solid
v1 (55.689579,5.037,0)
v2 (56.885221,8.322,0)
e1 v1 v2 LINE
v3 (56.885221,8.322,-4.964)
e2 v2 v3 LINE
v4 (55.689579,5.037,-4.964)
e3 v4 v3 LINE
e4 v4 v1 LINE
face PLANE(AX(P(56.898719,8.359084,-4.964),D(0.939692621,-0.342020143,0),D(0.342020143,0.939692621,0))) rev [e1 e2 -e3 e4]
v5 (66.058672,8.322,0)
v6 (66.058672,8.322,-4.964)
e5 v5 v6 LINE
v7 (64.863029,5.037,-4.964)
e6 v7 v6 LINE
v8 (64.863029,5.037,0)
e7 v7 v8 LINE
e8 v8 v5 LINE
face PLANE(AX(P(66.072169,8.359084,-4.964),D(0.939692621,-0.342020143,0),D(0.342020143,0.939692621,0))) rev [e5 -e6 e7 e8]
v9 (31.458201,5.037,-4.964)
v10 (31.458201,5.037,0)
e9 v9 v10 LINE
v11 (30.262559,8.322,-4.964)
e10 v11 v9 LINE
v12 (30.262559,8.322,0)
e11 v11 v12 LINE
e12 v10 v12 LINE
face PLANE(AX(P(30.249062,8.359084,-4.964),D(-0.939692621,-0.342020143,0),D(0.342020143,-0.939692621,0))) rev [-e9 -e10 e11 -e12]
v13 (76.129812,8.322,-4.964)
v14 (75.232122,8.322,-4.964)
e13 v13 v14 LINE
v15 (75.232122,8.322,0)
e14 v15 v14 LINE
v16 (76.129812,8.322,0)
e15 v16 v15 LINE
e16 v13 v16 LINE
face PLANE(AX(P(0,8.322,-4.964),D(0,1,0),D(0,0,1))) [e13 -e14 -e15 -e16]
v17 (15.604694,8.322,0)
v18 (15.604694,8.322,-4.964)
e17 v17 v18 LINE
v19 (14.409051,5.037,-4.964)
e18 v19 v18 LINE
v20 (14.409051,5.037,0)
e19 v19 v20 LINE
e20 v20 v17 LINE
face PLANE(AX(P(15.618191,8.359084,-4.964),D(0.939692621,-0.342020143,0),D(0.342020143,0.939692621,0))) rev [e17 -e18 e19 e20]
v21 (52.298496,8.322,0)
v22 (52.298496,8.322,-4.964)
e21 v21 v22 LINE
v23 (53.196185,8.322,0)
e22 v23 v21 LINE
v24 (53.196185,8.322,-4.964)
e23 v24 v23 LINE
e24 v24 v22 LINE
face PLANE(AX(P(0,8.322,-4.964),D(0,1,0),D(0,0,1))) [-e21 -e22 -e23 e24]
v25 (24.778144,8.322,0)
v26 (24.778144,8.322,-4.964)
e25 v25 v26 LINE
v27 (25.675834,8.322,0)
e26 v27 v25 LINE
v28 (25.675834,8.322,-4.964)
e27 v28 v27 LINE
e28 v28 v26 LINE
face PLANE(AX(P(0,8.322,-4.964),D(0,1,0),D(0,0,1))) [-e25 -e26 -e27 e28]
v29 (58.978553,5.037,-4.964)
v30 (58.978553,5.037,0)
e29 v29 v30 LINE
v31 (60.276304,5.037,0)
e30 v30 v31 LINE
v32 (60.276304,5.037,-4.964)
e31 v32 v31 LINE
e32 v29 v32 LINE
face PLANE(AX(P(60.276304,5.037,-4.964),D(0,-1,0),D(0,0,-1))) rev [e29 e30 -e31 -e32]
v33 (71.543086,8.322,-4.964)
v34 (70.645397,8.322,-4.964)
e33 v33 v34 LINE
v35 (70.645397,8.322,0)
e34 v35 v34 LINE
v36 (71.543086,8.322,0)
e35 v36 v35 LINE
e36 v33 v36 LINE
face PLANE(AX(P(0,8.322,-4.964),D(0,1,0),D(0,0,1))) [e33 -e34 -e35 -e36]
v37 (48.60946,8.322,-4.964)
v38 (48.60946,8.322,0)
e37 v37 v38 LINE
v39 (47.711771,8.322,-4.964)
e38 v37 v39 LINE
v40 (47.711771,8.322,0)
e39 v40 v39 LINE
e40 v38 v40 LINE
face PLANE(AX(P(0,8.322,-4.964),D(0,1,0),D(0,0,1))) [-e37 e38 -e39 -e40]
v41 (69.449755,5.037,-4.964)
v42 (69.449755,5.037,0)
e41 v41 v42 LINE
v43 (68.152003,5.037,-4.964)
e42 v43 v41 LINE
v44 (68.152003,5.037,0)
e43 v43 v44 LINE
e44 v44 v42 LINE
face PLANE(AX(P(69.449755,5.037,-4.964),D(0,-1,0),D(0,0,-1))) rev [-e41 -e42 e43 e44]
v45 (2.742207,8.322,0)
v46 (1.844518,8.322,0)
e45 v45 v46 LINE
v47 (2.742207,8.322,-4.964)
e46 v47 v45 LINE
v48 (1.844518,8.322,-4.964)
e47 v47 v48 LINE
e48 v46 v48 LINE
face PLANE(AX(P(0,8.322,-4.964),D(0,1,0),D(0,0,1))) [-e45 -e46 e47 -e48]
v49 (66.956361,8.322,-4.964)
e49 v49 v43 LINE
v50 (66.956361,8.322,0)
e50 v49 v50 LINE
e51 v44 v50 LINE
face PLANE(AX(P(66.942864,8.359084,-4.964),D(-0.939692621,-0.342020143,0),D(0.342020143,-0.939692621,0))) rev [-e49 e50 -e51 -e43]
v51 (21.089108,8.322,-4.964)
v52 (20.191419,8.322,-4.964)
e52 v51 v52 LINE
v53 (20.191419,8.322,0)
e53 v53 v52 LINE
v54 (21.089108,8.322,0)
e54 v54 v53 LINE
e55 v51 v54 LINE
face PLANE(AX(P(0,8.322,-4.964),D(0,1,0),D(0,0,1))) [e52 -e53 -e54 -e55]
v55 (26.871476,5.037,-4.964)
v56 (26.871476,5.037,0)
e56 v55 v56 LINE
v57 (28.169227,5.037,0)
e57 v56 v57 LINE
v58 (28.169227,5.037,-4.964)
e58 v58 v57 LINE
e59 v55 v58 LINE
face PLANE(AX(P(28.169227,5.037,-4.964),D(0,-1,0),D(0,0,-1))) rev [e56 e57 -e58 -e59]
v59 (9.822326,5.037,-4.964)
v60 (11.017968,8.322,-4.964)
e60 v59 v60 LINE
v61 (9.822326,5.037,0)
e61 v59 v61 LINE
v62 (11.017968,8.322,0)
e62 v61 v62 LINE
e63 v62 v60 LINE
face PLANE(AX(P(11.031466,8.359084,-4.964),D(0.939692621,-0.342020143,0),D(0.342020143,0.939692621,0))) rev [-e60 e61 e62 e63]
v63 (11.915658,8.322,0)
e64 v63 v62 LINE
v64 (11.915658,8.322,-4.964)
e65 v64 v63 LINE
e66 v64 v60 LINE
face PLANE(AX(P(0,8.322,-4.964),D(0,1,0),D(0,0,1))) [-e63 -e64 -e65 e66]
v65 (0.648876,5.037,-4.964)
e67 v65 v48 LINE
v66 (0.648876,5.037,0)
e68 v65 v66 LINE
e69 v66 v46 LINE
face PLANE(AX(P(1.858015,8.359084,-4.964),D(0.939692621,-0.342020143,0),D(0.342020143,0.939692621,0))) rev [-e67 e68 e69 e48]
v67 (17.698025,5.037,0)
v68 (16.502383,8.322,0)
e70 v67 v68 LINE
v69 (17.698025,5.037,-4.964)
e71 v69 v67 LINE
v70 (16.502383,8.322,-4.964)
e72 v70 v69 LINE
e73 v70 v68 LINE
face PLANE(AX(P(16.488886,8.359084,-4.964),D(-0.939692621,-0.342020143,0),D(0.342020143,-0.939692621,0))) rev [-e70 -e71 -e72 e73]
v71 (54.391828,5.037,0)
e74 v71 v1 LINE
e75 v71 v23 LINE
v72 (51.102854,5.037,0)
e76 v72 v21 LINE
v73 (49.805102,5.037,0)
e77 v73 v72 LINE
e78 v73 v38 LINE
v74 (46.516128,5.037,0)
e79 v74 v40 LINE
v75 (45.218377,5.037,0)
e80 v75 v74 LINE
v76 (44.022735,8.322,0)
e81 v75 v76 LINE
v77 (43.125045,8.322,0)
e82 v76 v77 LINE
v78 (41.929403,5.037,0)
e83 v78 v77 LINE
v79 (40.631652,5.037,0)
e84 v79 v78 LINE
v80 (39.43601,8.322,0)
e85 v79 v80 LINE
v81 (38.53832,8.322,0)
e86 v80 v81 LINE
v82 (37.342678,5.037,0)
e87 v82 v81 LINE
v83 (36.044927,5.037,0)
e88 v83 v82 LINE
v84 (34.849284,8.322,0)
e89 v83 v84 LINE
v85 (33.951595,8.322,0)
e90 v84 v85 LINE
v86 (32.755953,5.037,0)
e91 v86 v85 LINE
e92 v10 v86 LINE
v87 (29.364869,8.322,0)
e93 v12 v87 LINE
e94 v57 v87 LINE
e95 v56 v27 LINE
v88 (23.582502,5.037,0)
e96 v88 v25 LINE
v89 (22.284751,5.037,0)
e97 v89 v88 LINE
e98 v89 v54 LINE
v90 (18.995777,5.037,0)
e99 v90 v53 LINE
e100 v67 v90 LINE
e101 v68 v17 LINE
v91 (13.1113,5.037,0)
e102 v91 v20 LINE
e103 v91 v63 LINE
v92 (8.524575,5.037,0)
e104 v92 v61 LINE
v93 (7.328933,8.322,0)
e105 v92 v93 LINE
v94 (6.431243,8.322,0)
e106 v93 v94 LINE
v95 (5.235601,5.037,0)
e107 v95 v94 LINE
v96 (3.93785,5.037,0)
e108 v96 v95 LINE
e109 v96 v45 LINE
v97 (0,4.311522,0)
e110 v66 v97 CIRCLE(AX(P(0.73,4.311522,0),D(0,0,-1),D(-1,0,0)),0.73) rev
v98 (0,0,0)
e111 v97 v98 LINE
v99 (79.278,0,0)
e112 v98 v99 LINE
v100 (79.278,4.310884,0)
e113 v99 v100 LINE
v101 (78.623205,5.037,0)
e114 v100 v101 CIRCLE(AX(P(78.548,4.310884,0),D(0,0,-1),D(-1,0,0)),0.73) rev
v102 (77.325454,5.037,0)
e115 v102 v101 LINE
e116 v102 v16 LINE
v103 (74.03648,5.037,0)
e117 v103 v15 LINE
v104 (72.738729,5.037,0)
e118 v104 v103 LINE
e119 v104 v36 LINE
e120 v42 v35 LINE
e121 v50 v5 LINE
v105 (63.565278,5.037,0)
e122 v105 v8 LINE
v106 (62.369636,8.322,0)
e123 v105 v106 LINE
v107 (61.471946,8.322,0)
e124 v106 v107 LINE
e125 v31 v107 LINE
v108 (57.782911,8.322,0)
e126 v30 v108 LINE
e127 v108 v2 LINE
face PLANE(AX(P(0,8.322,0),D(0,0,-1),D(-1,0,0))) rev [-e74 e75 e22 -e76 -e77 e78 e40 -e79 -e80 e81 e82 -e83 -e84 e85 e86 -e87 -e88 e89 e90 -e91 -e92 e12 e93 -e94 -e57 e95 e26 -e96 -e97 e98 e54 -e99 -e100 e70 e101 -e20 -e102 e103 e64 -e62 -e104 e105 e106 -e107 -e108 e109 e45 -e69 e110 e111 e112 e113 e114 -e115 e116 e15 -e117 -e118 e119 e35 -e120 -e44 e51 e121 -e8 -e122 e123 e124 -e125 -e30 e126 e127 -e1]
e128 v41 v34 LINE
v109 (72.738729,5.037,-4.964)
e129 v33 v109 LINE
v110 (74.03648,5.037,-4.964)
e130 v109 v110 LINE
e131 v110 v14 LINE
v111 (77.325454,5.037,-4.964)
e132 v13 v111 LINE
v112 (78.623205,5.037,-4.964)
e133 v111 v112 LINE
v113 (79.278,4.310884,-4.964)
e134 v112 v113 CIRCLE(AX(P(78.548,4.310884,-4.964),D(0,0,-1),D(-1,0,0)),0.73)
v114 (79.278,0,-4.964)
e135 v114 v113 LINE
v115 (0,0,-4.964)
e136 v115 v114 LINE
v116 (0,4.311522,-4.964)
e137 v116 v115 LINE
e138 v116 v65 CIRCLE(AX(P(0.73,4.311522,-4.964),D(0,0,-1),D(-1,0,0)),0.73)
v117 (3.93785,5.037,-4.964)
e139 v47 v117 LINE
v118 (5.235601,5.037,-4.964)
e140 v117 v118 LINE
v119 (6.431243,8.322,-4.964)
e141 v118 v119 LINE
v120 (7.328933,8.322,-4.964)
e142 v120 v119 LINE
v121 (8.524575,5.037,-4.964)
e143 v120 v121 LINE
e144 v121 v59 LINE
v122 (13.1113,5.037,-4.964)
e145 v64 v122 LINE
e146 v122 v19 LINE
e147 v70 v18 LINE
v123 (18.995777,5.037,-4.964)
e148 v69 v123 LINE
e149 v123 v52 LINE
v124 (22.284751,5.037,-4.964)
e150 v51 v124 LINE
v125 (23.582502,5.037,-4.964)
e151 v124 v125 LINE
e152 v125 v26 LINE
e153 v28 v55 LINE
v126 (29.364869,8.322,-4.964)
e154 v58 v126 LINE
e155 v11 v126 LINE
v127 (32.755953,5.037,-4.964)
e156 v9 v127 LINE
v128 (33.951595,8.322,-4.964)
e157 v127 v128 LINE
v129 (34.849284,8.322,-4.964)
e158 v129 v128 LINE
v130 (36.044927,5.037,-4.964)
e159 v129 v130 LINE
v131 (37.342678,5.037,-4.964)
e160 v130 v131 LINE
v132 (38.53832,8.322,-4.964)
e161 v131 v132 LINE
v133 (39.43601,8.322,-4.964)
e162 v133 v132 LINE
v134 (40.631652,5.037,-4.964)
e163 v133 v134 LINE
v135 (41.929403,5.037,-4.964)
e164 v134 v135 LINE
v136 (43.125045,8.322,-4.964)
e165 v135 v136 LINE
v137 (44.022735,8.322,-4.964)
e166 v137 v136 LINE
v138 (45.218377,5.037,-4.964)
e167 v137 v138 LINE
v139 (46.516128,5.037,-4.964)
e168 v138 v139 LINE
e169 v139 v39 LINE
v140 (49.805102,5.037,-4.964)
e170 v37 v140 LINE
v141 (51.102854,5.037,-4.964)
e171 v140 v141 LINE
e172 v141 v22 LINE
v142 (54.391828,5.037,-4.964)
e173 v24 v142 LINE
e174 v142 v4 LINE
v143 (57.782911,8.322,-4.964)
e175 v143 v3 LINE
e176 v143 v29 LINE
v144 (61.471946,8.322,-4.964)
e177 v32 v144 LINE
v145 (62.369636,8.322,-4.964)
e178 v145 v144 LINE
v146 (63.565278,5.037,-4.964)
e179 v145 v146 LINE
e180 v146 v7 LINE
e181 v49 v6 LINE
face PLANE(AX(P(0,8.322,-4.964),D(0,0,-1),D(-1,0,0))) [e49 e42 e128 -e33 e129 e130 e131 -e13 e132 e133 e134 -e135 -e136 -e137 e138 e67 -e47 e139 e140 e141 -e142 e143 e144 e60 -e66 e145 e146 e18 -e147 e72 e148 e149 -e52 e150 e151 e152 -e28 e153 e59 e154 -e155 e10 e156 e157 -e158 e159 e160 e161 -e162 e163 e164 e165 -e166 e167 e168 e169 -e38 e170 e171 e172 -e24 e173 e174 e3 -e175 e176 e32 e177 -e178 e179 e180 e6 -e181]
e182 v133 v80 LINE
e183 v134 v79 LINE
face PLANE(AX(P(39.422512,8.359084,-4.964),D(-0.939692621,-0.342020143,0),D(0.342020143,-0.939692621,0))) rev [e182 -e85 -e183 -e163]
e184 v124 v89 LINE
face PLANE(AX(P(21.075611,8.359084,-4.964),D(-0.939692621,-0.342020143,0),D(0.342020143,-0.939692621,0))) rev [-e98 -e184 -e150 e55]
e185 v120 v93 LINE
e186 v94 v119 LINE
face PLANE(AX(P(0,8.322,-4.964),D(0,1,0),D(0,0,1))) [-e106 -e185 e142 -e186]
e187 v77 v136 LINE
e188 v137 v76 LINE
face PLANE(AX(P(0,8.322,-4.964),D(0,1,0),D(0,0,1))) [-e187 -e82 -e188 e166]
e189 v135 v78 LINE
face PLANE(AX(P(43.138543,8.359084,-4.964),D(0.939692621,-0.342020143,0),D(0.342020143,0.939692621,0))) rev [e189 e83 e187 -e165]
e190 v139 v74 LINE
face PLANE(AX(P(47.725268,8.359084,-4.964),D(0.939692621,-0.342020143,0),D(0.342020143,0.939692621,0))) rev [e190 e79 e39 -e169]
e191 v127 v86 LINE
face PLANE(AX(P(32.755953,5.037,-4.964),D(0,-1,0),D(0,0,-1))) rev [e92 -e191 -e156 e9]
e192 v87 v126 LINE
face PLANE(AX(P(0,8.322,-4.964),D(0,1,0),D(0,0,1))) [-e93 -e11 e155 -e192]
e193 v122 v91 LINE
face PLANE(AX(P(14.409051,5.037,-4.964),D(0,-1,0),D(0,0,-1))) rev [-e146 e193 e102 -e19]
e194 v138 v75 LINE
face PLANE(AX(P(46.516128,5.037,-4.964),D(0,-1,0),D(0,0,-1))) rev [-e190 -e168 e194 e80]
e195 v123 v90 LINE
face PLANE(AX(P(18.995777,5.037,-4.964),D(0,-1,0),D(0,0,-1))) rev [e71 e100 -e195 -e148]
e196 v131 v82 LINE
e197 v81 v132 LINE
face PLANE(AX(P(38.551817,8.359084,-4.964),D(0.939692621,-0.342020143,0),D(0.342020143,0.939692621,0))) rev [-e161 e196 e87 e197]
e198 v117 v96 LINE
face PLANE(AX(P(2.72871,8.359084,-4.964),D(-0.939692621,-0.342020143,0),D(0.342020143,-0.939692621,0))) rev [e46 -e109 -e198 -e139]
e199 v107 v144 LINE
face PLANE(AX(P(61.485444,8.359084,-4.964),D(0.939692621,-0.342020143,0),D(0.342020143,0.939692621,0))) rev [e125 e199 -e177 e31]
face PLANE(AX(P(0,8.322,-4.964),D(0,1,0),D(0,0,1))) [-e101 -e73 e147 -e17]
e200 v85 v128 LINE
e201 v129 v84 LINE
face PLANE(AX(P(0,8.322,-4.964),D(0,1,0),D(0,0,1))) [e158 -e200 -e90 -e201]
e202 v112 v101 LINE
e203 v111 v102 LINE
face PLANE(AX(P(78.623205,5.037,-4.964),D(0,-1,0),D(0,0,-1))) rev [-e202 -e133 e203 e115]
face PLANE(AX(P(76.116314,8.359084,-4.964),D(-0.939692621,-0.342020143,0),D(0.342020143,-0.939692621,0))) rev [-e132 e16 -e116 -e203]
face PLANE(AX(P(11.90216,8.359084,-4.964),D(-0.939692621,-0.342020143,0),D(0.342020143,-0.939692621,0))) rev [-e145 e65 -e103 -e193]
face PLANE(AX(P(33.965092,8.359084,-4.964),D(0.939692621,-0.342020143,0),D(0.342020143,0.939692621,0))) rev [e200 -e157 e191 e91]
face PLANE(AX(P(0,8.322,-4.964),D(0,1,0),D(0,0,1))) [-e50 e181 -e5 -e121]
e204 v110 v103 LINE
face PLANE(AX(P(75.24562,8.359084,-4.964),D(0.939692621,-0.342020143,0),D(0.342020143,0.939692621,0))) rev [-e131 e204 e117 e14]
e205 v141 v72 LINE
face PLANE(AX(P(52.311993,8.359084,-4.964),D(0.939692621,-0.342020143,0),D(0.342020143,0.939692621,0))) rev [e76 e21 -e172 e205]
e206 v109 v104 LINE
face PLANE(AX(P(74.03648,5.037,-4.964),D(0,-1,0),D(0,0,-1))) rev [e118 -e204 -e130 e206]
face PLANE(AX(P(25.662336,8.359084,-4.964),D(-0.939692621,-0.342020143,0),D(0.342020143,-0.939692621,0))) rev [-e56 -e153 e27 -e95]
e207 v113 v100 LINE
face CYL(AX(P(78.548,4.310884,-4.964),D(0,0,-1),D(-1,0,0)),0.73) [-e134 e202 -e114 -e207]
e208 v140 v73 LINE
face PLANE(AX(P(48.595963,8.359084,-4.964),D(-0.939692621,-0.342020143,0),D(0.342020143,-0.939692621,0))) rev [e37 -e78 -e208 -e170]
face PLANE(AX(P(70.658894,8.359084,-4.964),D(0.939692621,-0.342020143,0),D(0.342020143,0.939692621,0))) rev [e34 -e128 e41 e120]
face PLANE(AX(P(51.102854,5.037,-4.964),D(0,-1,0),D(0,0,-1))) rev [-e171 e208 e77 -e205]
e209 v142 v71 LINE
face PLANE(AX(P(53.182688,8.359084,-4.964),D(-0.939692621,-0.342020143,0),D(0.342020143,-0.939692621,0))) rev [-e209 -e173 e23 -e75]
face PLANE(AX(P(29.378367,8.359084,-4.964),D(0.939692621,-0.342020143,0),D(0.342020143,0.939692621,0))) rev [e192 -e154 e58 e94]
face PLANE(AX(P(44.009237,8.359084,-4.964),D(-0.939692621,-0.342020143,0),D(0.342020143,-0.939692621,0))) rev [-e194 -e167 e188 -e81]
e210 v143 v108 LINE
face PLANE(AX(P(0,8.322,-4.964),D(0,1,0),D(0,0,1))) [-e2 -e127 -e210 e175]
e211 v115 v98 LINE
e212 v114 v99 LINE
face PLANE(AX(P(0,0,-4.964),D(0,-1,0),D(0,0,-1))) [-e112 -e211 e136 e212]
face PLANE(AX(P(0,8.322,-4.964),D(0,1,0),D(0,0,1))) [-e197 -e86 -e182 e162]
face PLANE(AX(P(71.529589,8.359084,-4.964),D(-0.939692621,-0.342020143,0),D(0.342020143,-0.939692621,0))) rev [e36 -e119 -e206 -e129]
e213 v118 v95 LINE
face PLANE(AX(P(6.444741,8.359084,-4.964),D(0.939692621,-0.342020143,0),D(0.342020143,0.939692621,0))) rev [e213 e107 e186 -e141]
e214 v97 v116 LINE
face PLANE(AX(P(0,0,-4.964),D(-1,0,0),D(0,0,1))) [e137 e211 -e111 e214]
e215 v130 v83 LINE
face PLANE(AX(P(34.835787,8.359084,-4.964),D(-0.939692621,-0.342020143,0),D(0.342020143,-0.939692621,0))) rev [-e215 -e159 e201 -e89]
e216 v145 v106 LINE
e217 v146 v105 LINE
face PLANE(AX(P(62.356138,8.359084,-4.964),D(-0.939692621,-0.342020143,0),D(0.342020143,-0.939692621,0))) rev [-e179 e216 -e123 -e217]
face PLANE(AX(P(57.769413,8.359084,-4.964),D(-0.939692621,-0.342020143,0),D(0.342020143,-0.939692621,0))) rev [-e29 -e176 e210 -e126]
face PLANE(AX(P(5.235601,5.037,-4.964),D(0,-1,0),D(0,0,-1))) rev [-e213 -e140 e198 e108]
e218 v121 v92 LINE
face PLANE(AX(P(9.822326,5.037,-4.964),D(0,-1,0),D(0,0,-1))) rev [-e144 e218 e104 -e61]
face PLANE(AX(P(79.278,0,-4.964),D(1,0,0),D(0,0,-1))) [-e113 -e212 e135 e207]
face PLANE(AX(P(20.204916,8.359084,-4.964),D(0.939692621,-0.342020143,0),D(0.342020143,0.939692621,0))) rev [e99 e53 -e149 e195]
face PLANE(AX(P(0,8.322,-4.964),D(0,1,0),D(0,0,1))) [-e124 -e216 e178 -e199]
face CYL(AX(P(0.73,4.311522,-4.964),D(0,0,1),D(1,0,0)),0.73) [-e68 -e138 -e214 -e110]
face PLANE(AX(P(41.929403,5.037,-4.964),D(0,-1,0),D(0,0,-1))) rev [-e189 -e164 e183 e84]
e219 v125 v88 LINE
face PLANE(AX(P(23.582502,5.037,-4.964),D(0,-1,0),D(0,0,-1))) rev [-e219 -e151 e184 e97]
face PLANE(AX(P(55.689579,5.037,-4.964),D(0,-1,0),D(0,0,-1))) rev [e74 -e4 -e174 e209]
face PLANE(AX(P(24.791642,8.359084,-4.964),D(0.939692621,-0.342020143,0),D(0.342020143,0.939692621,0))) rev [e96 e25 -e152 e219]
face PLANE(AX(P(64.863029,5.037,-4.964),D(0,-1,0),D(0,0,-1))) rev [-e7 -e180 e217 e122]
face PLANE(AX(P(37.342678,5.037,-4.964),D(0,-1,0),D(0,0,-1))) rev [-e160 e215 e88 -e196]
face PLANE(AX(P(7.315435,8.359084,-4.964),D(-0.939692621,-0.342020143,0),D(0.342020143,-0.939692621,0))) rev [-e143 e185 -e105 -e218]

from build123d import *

# Parameters (mm, degrees)
BLANKSKE_W        = 54.3
BLANKSKE_H        = 5.7
BLANK_DEPTH       = 3.4
TOOTHCUTSIM_DEPTH = 55.704113191
TEETHCUTS_COUNT   = 18
TEETHCUTS_PITCH   = 3.14159265
VERRUNDUNG1_R     = 0.5
VERRUNDUNG2_R     = 0.5
SCALE1_SCALE      = 1.46


with BuildPart() as part:
    # BlankSke → Blank (new body)
    with BuildSketch(Plane.XY):
        with Locations((27.15, 2.85)):
            Rectangle(BLANKSKE_W, BLANKSKE_H)
    extrude(amount=-BLANK_DEPTH)

    # TooCutSkeSim → ToothCutSim (cut, through all)
    with BuildSketch(Plane.XY):
        Polygon((0.44443537, 3.45), (-0.44443537, 3.45), (-1.272613241, 5.7254), (1.272613241, 5.7254), align=None)
    toothcutsim = extrude(amount=-TOOTHCUTSIM_DEPTH, mode=Mode.SUBTRACT)

    # TeethCuts: ToothCutSim ×18
    with Locations(*[(i * TEETHCUTS_PITCH, 0, 0) for i in range(1, TEETHCUTS_COUNT)]):
        add(toothcutsim, mode=Mode.SUBTRACT)

    # Verrundung1
    # the kernel refuses this fillet: 0.5 mm, written as the material it takes off along each edge
    with BuildSketch(Plane(origin=(54.3, 4.682214995, -7.723886484), x_dir=(0, -1, 0), z_dir=(0, 0, 1))) as verrundung1_piece_1:
        with BuildLine():
            CenterArc((1.729554594, -0.5), VERRUNDUNG1_R, 90, 84.086849411)
            Line((1.232214995, -0.44848958), (1.222268203, -0.447459372))
            ThreePointArc((1.222268203, -0.447459372), (0.612687296, -0.233641716), (-0.003420201, -0.009396926))
            Line((-0.003420201, -0.009396926), (0, 0.01))
            Line((0, 0.01), (1.729554594, 0.01))
            Line((1.729554594, 0.01), (1.729554594, 0))
        make_face()
    extrude(amount=12.047772969, mode=Mode.SUBTRACT)

    # Verrundung2
    # the kernel refuses this fillet: 0.5 mm, written as the material it takes off along each edge
    with BuildSketch(Plane(origin=(0, 3.45, 1.242257451), x_dir=(0, -1, 0), z_dir=(0, 0, -1))) as verrundung2_piece_1:
        with BuildLine():
            CenterArc((0.49690298, -0.5), VERRUNDUNG2_R, 90, 83.619583418)
            Line((0, -0.44443537), (-0.00993806, -0.443324077))
            ThreePointArc((-0.00993806, -0.443324077), (-0.01, -0.222217685), (-0.01, 0))
            Line((-0.01, 0), (0, 0.01))
            Line((0, 0.01), (0.49690298, 0.01))
            Line((0.49690298, 0.01), (0.49690298, 0))
        make_face()
    extrude(amount=5.884514902, mode=Mode.SUBTRACT)


with BuildPart() as part_1:
    # Scale1: scaled about (0, 0, 0)
    add(part.part.scale(SCALE1_SCALE))


solid = part_1.part
